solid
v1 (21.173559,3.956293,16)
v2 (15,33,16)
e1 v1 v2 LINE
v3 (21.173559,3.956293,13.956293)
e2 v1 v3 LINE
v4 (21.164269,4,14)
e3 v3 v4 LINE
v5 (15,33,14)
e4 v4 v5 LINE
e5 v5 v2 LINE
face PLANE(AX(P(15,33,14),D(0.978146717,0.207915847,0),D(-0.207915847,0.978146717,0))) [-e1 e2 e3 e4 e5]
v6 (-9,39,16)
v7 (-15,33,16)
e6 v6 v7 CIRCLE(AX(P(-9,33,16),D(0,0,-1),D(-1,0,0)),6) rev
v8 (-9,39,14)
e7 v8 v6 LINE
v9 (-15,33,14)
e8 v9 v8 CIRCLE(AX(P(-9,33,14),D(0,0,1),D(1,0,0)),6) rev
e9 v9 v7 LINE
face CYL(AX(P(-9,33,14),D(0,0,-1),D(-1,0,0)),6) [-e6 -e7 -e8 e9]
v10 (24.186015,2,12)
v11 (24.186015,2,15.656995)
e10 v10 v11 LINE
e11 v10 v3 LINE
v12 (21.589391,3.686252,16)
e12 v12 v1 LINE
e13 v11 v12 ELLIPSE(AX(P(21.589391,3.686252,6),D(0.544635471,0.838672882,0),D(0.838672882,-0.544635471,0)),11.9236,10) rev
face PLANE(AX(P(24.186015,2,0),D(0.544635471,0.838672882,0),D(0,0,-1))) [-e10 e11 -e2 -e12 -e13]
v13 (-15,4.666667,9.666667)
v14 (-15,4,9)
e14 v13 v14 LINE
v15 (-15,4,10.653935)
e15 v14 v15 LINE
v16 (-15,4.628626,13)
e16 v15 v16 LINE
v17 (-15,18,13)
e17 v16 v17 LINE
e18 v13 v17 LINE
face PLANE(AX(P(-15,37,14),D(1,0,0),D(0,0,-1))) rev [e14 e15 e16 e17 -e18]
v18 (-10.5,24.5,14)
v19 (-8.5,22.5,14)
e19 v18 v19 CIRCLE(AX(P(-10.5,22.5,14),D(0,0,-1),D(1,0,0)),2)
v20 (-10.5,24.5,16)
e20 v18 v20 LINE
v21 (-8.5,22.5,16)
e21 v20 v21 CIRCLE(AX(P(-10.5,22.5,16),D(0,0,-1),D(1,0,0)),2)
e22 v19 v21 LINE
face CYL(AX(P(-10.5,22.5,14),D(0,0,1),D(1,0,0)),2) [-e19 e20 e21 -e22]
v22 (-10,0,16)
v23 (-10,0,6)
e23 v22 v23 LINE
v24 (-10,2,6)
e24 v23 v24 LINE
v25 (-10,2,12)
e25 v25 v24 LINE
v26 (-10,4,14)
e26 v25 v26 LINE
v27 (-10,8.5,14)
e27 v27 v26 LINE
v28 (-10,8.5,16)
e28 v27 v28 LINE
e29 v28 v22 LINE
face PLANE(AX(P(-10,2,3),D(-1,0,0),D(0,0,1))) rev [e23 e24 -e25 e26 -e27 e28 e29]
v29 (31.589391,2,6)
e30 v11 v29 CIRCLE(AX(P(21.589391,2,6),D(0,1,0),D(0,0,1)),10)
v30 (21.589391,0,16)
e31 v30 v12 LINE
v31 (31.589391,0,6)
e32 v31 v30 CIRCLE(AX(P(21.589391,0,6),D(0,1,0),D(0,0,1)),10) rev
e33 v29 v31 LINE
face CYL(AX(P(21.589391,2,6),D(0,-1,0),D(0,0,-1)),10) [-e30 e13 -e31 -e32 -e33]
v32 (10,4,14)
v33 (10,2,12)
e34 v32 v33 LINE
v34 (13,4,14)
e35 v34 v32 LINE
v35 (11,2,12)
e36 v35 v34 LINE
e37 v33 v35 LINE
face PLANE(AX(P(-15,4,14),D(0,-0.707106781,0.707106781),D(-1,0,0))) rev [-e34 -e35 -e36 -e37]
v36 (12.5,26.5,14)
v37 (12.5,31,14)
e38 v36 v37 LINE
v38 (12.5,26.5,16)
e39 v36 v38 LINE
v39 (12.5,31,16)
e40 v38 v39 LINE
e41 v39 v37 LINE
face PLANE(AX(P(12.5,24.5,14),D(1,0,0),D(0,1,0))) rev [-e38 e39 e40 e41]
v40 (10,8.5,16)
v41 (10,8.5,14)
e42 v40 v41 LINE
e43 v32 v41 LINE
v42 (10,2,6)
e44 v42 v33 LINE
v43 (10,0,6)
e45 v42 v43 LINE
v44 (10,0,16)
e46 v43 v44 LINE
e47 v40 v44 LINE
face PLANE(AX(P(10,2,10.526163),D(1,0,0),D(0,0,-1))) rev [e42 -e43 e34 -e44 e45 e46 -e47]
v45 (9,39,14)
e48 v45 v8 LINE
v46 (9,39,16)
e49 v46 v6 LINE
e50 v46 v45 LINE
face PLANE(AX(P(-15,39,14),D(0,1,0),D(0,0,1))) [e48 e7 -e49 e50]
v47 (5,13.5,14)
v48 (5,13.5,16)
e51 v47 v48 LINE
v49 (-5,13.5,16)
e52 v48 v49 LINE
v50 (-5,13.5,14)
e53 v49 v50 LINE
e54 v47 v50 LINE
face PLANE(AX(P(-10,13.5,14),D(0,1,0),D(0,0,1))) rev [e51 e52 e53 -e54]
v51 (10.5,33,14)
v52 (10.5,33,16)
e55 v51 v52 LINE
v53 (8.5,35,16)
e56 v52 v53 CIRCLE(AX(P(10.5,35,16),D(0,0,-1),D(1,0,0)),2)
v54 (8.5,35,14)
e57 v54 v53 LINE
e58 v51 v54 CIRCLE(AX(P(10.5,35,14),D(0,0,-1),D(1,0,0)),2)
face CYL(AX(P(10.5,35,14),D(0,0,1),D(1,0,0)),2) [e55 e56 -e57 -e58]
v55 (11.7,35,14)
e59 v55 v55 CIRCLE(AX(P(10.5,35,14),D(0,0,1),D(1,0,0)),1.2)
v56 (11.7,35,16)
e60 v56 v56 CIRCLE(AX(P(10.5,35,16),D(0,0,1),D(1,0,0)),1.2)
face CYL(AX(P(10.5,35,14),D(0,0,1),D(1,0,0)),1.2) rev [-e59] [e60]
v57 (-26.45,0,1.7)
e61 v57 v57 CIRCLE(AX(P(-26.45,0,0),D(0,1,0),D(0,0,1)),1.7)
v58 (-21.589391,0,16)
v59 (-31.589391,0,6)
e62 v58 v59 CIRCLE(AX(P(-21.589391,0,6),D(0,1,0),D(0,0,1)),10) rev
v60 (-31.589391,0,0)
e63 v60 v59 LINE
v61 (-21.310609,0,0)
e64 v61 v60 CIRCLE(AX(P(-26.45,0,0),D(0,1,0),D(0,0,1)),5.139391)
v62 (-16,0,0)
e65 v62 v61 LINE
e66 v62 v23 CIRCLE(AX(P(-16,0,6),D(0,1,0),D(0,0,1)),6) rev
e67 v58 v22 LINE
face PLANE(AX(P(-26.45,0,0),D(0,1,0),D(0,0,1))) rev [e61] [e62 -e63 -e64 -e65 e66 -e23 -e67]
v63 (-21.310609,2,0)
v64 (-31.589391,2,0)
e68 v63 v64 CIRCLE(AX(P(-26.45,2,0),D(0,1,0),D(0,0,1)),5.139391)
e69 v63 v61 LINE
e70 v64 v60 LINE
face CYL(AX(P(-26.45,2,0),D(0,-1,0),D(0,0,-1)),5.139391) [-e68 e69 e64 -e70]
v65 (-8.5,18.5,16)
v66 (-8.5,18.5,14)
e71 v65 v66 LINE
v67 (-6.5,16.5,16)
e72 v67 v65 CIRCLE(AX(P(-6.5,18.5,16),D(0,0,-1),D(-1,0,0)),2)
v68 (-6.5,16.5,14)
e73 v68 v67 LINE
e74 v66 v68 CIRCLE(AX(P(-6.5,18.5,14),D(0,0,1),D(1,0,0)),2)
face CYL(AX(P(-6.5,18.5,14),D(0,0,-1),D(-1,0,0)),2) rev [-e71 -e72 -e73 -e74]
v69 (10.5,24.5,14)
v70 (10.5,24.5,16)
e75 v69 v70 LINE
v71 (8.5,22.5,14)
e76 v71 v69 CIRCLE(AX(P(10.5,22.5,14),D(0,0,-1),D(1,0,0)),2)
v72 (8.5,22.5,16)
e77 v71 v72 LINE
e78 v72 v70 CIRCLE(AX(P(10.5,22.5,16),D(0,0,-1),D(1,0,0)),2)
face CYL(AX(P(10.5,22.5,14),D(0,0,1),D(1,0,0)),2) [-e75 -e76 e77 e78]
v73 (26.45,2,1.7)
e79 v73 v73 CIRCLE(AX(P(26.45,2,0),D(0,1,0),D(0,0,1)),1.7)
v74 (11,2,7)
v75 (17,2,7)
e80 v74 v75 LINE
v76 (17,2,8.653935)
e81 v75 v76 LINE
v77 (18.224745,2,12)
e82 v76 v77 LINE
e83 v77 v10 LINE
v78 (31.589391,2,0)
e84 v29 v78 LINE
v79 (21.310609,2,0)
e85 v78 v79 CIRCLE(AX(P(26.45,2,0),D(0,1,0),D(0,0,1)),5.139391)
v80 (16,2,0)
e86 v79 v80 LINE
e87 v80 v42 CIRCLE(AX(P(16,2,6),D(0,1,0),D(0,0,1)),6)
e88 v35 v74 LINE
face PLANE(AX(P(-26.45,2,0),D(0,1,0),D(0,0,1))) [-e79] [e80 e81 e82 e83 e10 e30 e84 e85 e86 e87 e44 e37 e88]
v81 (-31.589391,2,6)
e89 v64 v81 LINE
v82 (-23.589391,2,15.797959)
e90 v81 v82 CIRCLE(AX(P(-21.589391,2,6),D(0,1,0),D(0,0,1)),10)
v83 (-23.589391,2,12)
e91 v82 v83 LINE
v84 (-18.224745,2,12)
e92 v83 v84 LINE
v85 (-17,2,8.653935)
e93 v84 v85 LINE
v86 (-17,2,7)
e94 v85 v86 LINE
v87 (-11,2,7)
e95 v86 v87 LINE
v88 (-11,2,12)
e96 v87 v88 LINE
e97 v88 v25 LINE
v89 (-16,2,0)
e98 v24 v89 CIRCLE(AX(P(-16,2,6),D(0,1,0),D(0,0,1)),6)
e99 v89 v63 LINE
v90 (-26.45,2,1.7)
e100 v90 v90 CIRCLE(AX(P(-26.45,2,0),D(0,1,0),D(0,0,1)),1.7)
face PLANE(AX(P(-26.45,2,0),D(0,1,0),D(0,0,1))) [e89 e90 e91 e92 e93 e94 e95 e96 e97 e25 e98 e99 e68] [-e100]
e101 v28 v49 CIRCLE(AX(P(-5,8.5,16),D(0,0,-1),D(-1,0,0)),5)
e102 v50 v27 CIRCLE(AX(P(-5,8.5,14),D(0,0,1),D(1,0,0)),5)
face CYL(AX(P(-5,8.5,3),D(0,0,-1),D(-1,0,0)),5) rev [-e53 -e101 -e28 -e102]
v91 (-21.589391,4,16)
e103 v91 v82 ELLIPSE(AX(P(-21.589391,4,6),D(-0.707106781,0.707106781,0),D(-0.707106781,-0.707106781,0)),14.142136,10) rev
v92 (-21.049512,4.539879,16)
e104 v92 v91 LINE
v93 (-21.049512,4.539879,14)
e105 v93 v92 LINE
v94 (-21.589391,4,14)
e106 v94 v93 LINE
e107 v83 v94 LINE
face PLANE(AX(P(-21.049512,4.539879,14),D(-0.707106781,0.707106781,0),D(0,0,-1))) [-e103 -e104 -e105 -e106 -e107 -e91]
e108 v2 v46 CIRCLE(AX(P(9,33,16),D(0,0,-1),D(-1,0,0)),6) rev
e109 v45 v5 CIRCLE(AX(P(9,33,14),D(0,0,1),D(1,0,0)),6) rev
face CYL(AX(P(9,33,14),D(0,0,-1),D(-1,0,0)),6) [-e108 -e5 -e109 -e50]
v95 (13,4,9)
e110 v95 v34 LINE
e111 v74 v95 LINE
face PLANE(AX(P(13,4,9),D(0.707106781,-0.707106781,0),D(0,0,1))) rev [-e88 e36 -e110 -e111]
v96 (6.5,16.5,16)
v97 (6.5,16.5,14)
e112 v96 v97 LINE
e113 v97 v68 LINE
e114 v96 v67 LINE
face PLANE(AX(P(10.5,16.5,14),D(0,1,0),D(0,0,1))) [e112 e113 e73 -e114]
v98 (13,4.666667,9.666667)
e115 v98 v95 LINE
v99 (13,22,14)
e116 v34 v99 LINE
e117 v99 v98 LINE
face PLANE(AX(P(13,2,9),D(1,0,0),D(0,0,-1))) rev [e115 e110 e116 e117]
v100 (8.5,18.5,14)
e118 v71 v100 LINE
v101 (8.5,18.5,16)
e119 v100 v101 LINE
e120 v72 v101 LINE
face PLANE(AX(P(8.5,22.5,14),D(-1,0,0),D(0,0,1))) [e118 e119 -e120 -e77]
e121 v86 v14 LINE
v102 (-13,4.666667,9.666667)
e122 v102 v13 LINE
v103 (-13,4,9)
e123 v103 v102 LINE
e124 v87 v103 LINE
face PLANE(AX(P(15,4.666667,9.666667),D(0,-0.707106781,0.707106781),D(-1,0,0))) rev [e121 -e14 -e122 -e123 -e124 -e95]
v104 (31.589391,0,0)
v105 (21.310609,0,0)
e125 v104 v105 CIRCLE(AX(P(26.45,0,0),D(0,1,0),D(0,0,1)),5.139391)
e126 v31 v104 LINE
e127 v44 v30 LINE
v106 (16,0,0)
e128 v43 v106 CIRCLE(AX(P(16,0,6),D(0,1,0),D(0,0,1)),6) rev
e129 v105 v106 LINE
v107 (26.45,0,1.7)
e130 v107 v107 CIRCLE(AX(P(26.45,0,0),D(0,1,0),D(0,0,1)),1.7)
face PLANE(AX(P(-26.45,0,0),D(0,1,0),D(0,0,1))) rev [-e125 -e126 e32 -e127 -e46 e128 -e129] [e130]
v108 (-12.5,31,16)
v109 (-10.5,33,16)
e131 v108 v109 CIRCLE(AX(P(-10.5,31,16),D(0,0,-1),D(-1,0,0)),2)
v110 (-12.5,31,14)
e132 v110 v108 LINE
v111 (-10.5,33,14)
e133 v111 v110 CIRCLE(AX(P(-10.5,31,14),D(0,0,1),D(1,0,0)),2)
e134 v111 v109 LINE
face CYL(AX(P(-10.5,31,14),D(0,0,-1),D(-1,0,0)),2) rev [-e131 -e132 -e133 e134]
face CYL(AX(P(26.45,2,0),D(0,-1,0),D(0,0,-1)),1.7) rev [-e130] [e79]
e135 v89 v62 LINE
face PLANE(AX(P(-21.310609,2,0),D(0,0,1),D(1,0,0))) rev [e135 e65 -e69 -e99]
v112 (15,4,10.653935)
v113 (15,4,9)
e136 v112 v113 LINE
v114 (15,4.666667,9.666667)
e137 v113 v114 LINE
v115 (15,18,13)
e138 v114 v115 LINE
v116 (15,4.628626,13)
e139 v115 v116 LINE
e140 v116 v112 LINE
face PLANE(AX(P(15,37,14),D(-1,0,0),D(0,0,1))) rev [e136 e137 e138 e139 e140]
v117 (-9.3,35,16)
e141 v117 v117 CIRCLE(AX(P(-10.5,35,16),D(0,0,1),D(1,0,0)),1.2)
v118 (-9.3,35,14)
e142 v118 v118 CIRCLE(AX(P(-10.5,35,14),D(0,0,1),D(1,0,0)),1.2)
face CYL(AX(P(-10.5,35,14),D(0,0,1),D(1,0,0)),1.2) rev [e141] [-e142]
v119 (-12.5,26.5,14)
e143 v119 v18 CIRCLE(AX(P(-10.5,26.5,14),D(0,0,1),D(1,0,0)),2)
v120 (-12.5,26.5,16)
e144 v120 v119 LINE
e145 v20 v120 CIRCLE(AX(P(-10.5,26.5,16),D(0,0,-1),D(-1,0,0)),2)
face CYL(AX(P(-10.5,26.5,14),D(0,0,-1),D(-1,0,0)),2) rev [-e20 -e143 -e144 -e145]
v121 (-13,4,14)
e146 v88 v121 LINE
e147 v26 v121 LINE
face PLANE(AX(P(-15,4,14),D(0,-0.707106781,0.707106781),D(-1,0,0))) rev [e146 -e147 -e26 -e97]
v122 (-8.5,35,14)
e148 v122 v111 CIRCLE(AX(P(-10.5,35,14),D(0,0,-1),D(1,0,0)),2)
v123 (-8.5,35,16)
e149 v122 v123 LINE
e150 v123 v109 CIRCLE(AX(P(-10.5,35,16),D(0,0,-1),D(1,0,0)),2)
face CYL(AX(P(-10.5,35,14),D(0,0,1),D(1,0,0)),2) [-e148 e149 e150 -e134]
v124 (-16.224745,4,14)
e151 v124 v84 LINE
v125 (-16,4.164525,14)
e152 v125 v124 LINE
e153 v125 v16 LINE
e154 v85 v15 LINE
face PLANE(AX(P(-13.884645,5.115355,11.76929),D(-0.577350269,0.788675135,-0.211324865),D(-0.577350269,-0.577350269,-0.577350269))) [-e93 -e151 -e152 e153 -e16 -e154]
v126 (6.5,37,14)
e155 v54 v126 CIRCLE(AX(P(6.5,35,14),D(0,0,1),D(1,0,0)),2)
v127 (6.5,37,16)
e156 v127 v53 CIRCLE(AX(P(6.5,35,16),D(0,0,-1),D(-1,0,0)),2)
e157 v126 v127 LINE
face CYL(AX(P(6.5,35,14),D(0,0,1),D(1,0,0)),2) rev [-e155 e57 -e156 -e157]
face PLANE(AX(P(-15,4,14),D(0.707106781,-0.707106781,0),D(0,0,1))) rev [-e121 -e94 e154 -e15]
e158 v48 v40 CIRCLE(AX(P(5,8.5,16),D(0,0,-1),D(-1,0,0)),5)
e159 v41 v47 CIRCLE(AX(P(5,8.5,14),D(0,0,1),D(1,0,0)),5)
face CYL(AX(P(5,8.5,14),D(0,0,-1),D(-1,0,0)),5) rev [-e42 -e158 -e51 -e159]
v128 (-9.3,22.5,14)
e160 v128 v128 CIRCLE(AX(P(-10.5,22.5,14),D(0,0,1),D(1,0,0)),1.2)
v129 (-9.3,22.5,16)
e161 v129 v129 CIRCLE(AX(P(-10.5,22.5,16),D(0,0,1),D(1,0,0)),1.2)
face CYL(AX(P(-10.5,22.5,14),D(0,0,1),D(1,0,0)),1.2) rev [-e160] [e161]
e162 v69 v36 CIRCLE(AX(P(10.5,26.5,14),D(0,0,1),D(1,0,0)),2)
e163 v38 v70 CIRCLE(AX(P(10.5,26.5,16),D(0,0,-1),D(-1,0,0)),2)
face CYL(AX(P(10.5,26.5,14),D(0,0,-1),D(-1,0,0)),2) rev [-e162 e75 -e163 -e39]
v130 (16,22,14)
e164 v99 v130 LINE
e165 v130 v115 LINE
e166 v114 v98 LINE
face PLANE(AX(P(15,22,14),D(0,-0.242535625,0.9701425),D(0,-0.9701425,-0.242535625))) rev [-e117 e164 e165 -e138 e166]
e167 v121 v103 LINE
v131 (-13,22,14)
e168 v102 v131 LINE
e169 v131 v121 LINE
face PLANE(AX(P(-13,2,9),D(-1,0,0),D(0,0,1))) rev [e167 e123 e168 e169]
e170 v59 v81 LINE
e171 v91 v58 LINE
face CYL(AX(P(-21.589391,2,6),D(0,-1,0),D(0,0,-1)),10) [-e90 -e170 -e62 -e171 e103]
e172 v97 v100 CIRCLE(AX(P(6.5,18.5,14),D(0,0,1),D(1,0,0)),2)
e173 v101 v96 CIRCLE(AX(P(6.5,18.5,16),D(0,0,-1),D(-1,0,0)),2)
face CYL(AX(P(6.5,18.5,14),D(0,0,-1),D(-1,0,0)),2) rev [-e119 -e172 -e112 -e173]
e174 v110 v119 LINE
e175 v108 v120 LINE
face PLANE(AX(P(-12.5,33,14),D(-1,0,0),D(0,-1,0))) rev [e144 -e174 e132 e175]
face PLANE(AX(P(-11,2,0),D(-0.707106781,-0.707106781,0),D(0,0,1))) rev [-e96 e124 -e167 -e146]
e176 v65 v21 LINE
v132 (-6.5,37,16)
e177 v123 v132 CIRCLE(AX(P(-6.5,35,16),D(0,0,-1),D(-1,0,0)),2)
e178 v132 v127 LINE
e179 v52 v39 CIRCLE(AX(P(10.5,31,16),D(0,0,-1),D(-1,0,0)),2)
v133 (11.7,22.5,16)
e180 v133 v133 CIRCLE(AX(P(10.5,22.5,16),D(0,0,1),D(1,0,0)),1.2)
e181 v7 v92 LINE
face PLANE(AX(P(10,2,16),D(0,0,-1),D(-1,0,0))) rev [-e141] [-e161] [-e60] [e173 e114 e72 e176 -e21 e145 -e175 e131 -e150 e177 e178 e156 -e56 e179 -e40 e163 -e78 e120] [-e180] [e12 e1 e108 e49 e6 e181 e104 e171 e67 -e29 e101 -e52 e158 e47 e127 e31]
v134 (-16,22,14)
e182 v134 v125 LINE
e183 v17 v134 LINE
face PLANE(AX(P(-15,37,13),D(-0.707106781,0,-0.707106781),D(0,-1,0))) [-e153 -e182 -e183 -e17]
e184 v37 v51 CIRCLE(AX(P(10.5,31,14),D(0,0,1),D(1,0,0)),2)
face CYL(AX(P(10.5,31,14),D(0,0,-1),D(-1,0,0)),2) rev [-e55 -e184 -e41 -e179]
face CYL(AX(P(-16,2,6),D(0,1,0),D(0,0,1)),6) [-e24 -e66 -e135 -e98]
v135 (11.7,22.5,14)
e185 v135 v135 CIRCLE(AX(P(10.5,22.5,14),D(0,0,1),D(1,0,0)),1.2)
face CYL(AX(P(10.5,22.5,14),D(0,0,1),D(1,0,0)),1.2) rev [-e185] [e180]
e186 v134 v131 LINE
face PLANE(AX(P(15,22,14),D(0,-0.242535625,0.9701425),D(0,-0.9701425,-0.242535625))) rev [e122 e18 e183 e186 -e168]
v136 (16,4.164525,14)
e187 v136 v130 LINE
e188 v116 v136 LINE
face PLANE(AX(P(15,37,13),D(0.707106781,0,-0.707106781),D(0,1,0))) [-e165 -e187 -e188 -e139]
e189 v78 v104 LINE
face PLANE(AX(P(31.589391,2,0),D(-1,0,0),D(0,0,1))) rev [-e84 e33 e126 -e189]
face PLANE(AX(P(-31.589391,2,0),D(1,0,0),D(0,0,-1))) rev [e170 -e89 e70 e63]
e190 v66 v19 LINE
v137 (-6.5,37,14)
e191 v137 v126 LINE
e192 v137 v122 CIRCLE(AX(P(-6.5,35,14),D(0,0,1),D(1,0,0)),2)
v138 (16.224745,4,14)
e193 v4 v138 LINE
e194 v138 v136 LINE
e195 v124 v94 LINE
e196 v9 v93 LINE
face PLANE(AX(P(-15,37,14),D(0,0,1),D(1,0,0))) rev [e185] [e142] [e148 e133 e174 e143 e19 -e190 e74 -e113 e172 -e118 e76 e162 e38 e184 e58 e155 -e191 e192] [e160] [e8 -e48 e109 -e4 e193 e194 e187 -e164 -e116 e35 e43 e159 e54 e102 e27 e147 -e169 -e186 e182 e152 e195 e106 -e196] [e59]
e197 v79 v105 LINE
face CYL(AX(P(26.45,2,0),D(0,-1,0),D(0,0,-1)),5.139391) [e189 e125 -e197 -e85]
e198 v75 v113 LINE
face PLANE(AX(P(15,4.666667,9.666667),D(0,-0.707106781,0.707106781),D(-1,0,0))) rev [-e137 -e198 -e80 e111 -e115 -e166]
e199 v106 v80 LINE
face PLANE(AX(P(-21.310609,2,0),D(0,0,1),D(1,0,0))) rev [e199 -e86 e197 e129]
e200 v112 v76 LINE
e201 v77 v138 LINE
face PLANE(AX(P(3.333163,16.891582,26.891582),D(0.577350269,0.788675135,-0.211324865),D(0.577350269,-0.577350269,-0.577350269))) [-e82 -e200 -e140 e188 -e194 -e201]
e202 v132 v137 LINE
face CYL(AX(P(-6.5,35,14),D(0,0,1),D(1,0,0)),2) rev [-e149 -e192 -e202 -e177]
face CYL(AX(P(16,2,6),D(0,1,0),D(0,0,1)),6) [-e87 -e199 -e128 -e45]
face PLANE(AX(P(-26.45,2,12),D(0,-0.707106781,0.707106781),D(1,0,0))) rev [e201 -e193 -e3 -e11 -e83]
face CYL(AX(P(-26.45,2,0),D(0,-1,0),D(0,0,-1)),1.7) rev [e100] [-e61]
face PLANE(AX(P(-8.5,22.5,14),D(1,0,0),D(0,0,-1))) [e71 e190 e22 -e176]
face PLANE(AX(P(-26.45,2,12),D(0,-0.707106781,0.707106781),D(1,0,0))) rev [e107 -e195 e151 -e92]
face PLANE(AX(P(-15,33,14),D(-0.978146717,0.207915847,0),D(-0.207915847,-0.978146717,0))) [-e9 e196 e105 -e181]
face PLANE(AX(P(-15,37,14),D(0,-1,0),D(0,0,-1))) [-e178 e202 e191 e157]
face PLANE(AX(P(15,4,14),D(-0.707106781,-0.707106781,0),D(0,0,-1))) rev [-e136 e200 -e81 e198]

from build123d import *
from OCP.BRepFilletAPI import BRepFilletAPI_MakeChamfer

# Parameters (mm, degrees)
SKETCH1_R             = 1.7
BOSS_EXTRUDE1_DEPTH   = 2
SKETCH2_W             = 30
SKETCH2_H             = 2
BOSS_EXTRUDE2_DEPTH   = 35
CUT_EXTRUDE1_DEPTH    = 2
SKETCH5_W             = 17
SKETCH5_H             = 15.5
CUT_EXTRUDE2_DEPTH    = 2
SKETCH6_R             = 1.2
CUT_EXTRUDE3_DEPTH    = 2
BOSS_EXTRUDE4_START   = -2
SKETCH7_W             = 30
SKETCH7_H             = 2
BOSS_EXTRUDE4_DEPTH   = 2
SKETCH8_W             = 20
SKETCH8_H             = 3
CUT_EXTRUDE4_DEPTH    = 2
SKETCH9_W             = 17
SKETCH9_H             = 3
CUT_EXTRUDE5_DEPTH    = 2
SKETCH10_W            = 2
SKETCH10_H            = 20
BOSS_EXTRUDE5_DEPTH   = 5
CUT_EXTRUDE6_START    = -30
CUT_EXTRUDE6_DEPTH    = 30
FILLET1_R             = 10
SKETCH12_W            = 20
SKETCH12_H            = 18.563508327
CUT_EXTRUDE7_DEPTH    = 2
FILLET2_R             = 2
BOSS_EXTRUDE6_START   = -2
BOSS_EXTRUDE6_DEPTH   = 2
BOSS_EXTRUDE7_START   = -2
SKETCH14_W            = 21
SKETCH14_H            = 11.5
BOSS_EXTRUDE7_DEPTH   = 2
BOSS_EXTRUDE8_START   = -2
BOSS_EXTRUDE8_DEPTH   = 2
FILLET3_R             = 2
FILLET4_R             = 6
SKETCH16_W            = 20
SKETCH16_H            = 8.5
CUT_EXTRUDE8_DEPTH    = 2
FILLET5_R             = 5
CHAMFER1_SIZE         = 2
CHAMFER1_SIZE2        = 2.748737084
CHAMFER1_SIZE2_2      = 2.596624047
CHAMFER2_SIZE         = 1
CHAMFER2_EDGE_2_SIZE  = 1
CHAMFER2_EDGE_3_SIZE  = 1
CHAMFER2_EDGE_3_SIZE2 = 2.732050808
CHAMFER2_EDGE_4_SIZE  = 1
CHAMFER2_EDGE_4_SIZE2 = 2.732050808
FILLET6_R             = 6


# Some blends are built 0.0001 mm under size
with BuildPart() as part:
    # Sketch1 → Boss-Extrude1 (new body)
    with BuildSketch(Plane(origin=(0, 0, 0), x_dir=(1, 0, 0), z_dir=(0, 1, 0))):
        with BuildLine():
            Line((-21.310608918, 0), (21.310608918, 0))
            ThreePointArc((21.310608918, 0), (26.45, 5.139391082), (31.589391082, 0))
            Line((31.589391082, 0), (31.589391082, -16))
            Line((31.589391082, -16), (10, -16))
            Line((10, -16), (10, -10.526162893))
            Line((10, -10.526162893), (10, -3))
            Line((10, -3), (-10, -3))
            Line((-10, -3), (-10, -10.526162893))
            Line((-10, -10.526162893), (-10, -16))
            Line((-10, -16), (-31.589391082, -16))
            Line((-31.589391082, -16), (-31.589391082, 0))
            ThreePointArc((-31.589391082, 0), (-26.45, 5.139391082), (-21.310608918, 0))
        make_face()
        with Locations(Location((-26.45, 0, 0), (0, 0, 270))):
            Circle(SKETCH1_R, mode=Mode.SUBTRACT)
        with Locations(Location((26.45, 0, 0), (0, 0, 270))):
            Circle(SKETCH1_R, mode=Mode.SUBTRACT)
    extrude(amount=BOSS_EXTRUDE1_DEPTH)

    # Sketch2 → Boss-Extrude2 (add)
    with BuildSketch(Plane(origin=(0, 2, 0), x_dir=(1, 0, 0), z_dir=(0, 1, 0))):
        with Locations((0, -15)):
            Rectangle(SKETCH2_W, SKETCH2_H)
    extrude(amount=BOSS_EXTRUDE2_DEPTH)

    # Sketch4 → Cut-Extrude1 (cut)
    with BuildSketch(Plane.XY.offset(16)):
        with BuildLine():
            Line((-12.5, 33), (-12.5, 24.5))
            Line((-12.5, 24.5), (-10.5, 24.5))
            ThreePointArc((-10.5, 24.5), (-9.085786438, 23.914213562), (-8.5, 22.5))
            Line((-8.5, 22.5), (-8.5, 20.5))
            Line((-8.5, 20.5), (8.5, 20.5))
            Line((8.5, 20.5), (8.5, 22.5))
            ThreePointArc((8.5, 22.5), (9.085786438, 23.914213562), (10.5, 24.5))
            Line((10.5, 24.5), (12.5, 24.5))
            Line((12.5, 24.5), (12.5, 33))
            Line((12.5, 33), (10.5, 33))
            ThreePointArc((10.5, 33), (9.085786438, 33.585786438), (8.5, 35))
            Line((8.5, 35), (8.5, 37))
            Line((8.5, 37), (-8.5, 37))
            Line((-8.5, 37), (-8.5, 35))
            ThreePointArc((-8.5, 35), (-9.085786438, 33.585786438), (-10.5, 33))
            Line((-10.5, 33), (-12.5, 33))
        make_face()
    extrude(amount=-CUT_EXTRUDE1_DEPTH, mode=Mode.SUBTRACT)

    # Sketch5 → Cut-Extrude2 (cut)
    with BuildSketch(Plane.XY.offset(16)):
        with Locations((0, 12.75)):
            Rectangle(SKETCH5_W, SKETCH5_H)
    extrude(amount=-CUT_EXTRUDE2_DEPTH, mode=Mode.SUBTRACT)

    # Sketch6 → Cut-Extrude3 (cut)
    with BuildSketch(Plane.XY.offset(16)):
        with Locations((-10.5, 35)):
            Circle(SKETCH6_R)
        with Locations((10.5, 35)):
            Circle(SKETCH6_R)
        with Locations((-10.5, 22.5)):
            Circle(SKETCH6_R)
        with Locations((10.5, 22.5)):
            Circle(SKETCH6_R)
    extrude(amount=-CUT_EXTRUDE3_DEPTH, mode=Mode.SUBTRACT)

    # Sketch7 → Boss-Extrude4 (add)
    with BuildSketch(Plane.XY.offset(16).offset(BOSS_EXTRUDE4_START)):
        with Locations((0, 38)):
            Rectangle(SKETCH7_W, SKETCH7_H)
    extrude(amount=BOSS_EXTRUDE4_DEPTH)

    # Sketch8 → Cut-Extrude4 (cut)
    with BuildSketch(Plane(origin=(0, 2, 0), x_dir=(1, 0, 0), z_dir=(0, 1, 0))):
        with Locations((0, -1.5)):
            Rectangle(SKETCH8_W, SKETCH8_H)
    extrude(amount=-CUT_EXTRUDE4_DEPTH, mode=Mode.SUBTRACT)

    # Sketch9 → Cut-Extrude5 (cut)
    with BuildSketch(Plane.XY.offset(16)):
        with Locations((0, 3.5)):
            Rectangle(SKETCH9_W, SKETCH9_H)
    extrude(amount=-CUT_EXTRUDE5_DEPTH, mode=Mode.SUBTRACT)

    # Sketch10 → Boss-Extrude5 (add)
    with BuildSketch(Plane(origin=(0, 0, 14), x_dir=(-1, 0, 0), z_dir=(0, 0, -1))):
        with Locations((14, 12)):
            Rectangle(SKETCH10_W, SKETCH10_H)
        with Locations((-14, 12)):
            Rectangle(SKETCH10_W, SKETCH10_H)
    extrude(amount=BOSS_EXTRUDE5_DEPTH)

    # Sketch11 → Cut-Extrude6 (cut)
    with BuildSketch(Plane.ZY.offset(15).offset(CUT_EXTRUDE6_START)):
        Polygon((14, 22), (9, 2), (9, 22), align=None)
    extrude(amount=CUT_EXTRUDE6_DEPTH, mode=Mode.SUBTRACT)

    # Fillet1
    fillet1_edges = [part.edges().sort_by_distance(p)[0] for p in [
        (31.589391082, 1, 16),
        (-31.589391082, 1, 16),
    ]]
    fillet(fillet1_edges, radius=FILLET1_R)

    # Sketch12 → Cut-Extrude7 (cut)
    with BuildSketch(Plane.XY.offset(16)):
        with Locations((0, 11.281754164)):
            Rectangle(SKETCH12_W, SKETCH12_H)
    extrude(amount=-CUT_EXTRUDE7_DEPTH, mode=Mode.SUBTRACT)

    # Fillet2
    # the kernel refuses this fillet: 2 mm, written as the material it takes off along each edge
    with BuildSketch(Plane(origin=(8.5, 20.563508327, 9.158770817), x_dir=(0, 1, 0), z_dir=(0, 0, 1))) as fillet2_piece_1:
        with BuildLine():
            CenterArc((1.936491673, -2), FILLET2_R, 90, 75.522487814)
            Line((0, -1.5), (-0.038729833, -1.49))
            ThreePointArc((-0.038729833, -1.49), (-0.04, -0.75), (-0.04, 0))
            Line((-0.04, 0), (0, 0.04))
            Line((0, 0.04), (1.936491673, 0.04))
            Line((1.936491673, 0.04), (1.936491673, 0))
        make_face()
    extrude(amount=11.682458366, mode=Mode.SUBTRACT)
    with BuildSketch(Plane(origin=(-8.5, 20.563508327, 9.158770817), x_dir=(-1, 0, 0), z_dir=(0, 0, 1))) as fillet2_piece_2:
        with BuildLine():
            CenterArc((2, -1.936491673), FILLET2_R, 104.477512186, 75.522487814)
            Line((0, -1.936491673), (-0.04, -1.936491673))
            Line((-0.04, -1.936491673), (-0.04, 0))
            Line((-0.04, 0), (0, 0.04))
            ThreePointArc((0, 0.04), (0.75, 0.04), (1.49, 0.038729833))
            Line((1.49, 0.038729833), (1.5, 0))
        make_face()
    extrude(amount=11.682458366, mode=Mode.SUBTRACT)

    # Sketch13 → Boss-Extrude6 (add)
    with BuildSketch(Plane.XY.offset(16).offset(BOSS_EXTRUDE6_START)):
        Polygon((-15, 2), (-15, 33), (-21.589391082, 2), align=None)
        Polygon((21.589391082, 2), (15, 2), (15, 33), align=None)
    extrude(amount=BOSS_EXTRUDE6_DEPTH)

    # Sketch14 → Boss-Extrude7 (add)
    with BuildSketch(Plane.XY.offset(16).offset(BOSS_EXTRUDE7_START)):
        with Locations((0, 10.75)):
            Rectangle(SKETCH14_W, SKETCH14_H)
    extrude(amount=BOSS_EXTRUDE7_DEPTH)

    # Sketch15 → Boss-Extrude8 (add)
    with BuildSketch(Plane.XY.offset(16).offset(BOSS_EXTRUDE8_START)):
        with BuildLine():
            Line((-8.5, 22.5), (-8.5, 16.5))
            Line((-8.5, 16.5), (-10, 16.5))
            Line((-10, 16.5), (-10, 20.563508327))
            ThreePointArc((-10, 20.563508327), (-8.91886117, 21.275255129), (-8.5, 22.5))
        make_face()
        with BuildLine():
            Line((8.5, 22.5), (8.5, 16.5))
            Line((8.5, 16.5), (10, 16.5))
            Line((10, 16.5), (10, 20.563508327))
            ThreePointArc((10, 20.563508327), (8.91886117, 21.275255129), (8.5, 22.5))
        make_face()
    extrude(amount=BOSS_EXTRUDE8_DEPTH)

    # Fillet3
    fillet3_edges = [part.edges().sort_by_distance(p)[0] for p in [
        (-8.5, 16.5, 15),
        (8.5, 16.5, 15),
        (12.5, 24.5, 15),
        (-12.5, 24.5, 15),
        (12.5, 33, 15),
        (8.5, 37, 15),
        (-8.5, 37, 15),
        (-12.5, 33, 15),
    ]]
    fillet(fillet3_edges, radius=FILLET3_R - 0.0001)  # a hair under: the kernel refuses the full size

    # Fillet4
    fillet4_edges = [part.edges().sort_by_distance(p)[0] for p in [
        (15, 39, 15),
        (-15, 39, 15),
    ]]
    fillet(fillet4_edges, radius=FILLET4_R - 0.0001)  # a hair under: the kernel refuses the full size

    # Sketch16 → Cut-Extrude8 (cut)
    with BuildSketch(Plane.XY.offset(16)):
        with Locations((0, 9.25)):
            Rectangle(SKETCH16_W, SKETCH16_H)
    extrude(amount=-CUT_EXTRUDE8_DEPTH, mode=Mode.SUBTRACT)

    # Fillet5
    fillet5_edges = [part.edges().sort_by_distance(p)[0] for p in [
        (-10, 13.5, 15),
        (10, 13.5, 15),
    ]]
    fillet(fillet5_edges, radius=FILLET5_R)

    # Chamfer1: one chamfer whose edges measure the first distance from different faces: ONE call of the kernel's chamfer builder (chamfer() names one face for all edges)
    chamfer1_edges_1 = [part.edges().sort_by_distance(p)[0] for p in [
        (-13, 2, 11.5),
        (11.5, 2, 14),
        (13, 2, 11.5),
        (-18.294695541, 2, 14),
        (15, 2, 11.5),
        (18.294695541, 2, 14),
        (-11.5, 2, 14),
        (-15, 2, 11.5),
    ]]
    chamfer1_edges_2 = [part.edges().sort_by_distance(p)[0] for p in [
        (-14, 2, 9),
    ]]
    chamfer1_side_2 = [part.faces().sort_by_distance(p)[0] for p in [
        (-21.362181676, 2, 5.92457091),
    ]]
    chamfer1_edges_3 = [part.edges().sort_by_distance(p)[0] for p in [
        (14, 2, 9),
    ]]
    chamfer1_side_3 = [part.faces().sort_by_distance(p)[0] for p in [
        (21.362181676, 2, 5.92457091),
    ]]
    chamfer1_edges_4 = [part.edges().sort_by_distance(p)[0] for p in [
        (-21.589391082, 2, 15),
    ]]
    chamfer1_side_4 = [part.faces().sort_by_distance(p)[0] for p in [
        (-21.362181676, 2, 5.92457091),
    ]]
    chamfer1_edges_5 = [part.edges().sort_by_distance(p)[0] for p in [
        (21.589391082, 2, 15),
    ]]
    chamfer1_side_5 = [part.faces().sort_by_distance(p)[0] for p in [
        (18.294695541, 17.5, 15),
    ]]
    chamfer1 = BRepFilletAPI_MakeChamfer(part.part.solid().wrapped)
    for e in chamfer1_edges_1:
        chamfer1.Add(CHAMFER1_SIZE, e.wrapped)
    for e in chamfer1_edges_2:
        chamfer1.Add(CHAMFER1_SIZE, CHAMFER1_SIZE2, e.wrapped, chamfer1_side_2[0].wrapped)  # the first distance lies on this face
    for e in chamfer1_edges_3:
        chamfer1.Add(CHAMFER1_SIZE, CHAMFER1_SIZE2, e.wrapped, chamfer1_side_3[0].wrapped)  # the first distance lies on this face
    for e in chamfer1_edges_4:
        chamfer1.Add(CHAMFER1_SIZE, CHAMFER1_SIZE2_2, e.wrapped, chamfer1_side_4[0].wrapped)  # the first distance lies on this face
    for e in chamfer1_edges_5:
        chamfer1.Add(CHAMFER1_SIZE, CHAMFER1_SIZE2_2, e.wrapped, chamfer1_side_5[0].wrapped)  # the first distance lies on this face
    add(Compound.cast(chamfer1.Shape()), mode=Mode.REPLACE)

    # Chamfer2
    chamfer2_edges = [part.edges().sort_by_distance(p)[0] for p in [
        (15, 13, 14),
    ]]
    chamfer(chamfer2_edges, length=CHAMFER2_SIZE)

    # Chamfer2 edge 2
    chamfer2_edge_2_edges = [part.edges().sort_by_distance(p)[0] for p in [
        (-15, 13, 14),
    ]]
    chamfer(chamfer2_edge_2_edges, length=CHAMFER2_EDGE_2_SIZE)

    # Chamfer2 edge 3
    chamfer2_edge_3_edges = [part.edges().sort_by_distance(p)[0] for p in [
        (16, 3, 13),
    ]]
    chamfer2_edge_3_side = [part.faces().sort_by_distance(p)[0] for p in [
        (19.357625286, 2.973019207, 12.973019207),
    ]]
    chamfer(chamfer2_edge_3_edges, length=CHAMFER2_EDGE_3_SIZE, length2=CHAMFER2_EDGE_3_SIZE2, reference=chamfer2_edge_3_side[0])

    # Chamfer2 edge 4
    chamfer2_edge_4_edges = [part.edges().sort_by_distance(p)[0] for p in [
        (-16, 3, 13),
    ]]
    chamfer2_edge_4_side = [part.faces().sort_by_distance(p)[0] for p in [
        (-19.294695541, 3, 13),
    ]]
    chamfer(chamfer2_edge_4_edges, length=CHAMFER2_EDGE_4_SIZE, length2=CHAMFER2_EDGE_4_SIZE2, reference=chamfer2_edge_4_side[0])

    # Fillet6
    fillet6_edges = [part.edges().sort_by_distance(p)[0] for p in [
        (-10, 1, 0),
        (10, 1, 0),
    ]]
    fillet(fillet6_edges, radius=FILLET6_R)


solid = part.part
